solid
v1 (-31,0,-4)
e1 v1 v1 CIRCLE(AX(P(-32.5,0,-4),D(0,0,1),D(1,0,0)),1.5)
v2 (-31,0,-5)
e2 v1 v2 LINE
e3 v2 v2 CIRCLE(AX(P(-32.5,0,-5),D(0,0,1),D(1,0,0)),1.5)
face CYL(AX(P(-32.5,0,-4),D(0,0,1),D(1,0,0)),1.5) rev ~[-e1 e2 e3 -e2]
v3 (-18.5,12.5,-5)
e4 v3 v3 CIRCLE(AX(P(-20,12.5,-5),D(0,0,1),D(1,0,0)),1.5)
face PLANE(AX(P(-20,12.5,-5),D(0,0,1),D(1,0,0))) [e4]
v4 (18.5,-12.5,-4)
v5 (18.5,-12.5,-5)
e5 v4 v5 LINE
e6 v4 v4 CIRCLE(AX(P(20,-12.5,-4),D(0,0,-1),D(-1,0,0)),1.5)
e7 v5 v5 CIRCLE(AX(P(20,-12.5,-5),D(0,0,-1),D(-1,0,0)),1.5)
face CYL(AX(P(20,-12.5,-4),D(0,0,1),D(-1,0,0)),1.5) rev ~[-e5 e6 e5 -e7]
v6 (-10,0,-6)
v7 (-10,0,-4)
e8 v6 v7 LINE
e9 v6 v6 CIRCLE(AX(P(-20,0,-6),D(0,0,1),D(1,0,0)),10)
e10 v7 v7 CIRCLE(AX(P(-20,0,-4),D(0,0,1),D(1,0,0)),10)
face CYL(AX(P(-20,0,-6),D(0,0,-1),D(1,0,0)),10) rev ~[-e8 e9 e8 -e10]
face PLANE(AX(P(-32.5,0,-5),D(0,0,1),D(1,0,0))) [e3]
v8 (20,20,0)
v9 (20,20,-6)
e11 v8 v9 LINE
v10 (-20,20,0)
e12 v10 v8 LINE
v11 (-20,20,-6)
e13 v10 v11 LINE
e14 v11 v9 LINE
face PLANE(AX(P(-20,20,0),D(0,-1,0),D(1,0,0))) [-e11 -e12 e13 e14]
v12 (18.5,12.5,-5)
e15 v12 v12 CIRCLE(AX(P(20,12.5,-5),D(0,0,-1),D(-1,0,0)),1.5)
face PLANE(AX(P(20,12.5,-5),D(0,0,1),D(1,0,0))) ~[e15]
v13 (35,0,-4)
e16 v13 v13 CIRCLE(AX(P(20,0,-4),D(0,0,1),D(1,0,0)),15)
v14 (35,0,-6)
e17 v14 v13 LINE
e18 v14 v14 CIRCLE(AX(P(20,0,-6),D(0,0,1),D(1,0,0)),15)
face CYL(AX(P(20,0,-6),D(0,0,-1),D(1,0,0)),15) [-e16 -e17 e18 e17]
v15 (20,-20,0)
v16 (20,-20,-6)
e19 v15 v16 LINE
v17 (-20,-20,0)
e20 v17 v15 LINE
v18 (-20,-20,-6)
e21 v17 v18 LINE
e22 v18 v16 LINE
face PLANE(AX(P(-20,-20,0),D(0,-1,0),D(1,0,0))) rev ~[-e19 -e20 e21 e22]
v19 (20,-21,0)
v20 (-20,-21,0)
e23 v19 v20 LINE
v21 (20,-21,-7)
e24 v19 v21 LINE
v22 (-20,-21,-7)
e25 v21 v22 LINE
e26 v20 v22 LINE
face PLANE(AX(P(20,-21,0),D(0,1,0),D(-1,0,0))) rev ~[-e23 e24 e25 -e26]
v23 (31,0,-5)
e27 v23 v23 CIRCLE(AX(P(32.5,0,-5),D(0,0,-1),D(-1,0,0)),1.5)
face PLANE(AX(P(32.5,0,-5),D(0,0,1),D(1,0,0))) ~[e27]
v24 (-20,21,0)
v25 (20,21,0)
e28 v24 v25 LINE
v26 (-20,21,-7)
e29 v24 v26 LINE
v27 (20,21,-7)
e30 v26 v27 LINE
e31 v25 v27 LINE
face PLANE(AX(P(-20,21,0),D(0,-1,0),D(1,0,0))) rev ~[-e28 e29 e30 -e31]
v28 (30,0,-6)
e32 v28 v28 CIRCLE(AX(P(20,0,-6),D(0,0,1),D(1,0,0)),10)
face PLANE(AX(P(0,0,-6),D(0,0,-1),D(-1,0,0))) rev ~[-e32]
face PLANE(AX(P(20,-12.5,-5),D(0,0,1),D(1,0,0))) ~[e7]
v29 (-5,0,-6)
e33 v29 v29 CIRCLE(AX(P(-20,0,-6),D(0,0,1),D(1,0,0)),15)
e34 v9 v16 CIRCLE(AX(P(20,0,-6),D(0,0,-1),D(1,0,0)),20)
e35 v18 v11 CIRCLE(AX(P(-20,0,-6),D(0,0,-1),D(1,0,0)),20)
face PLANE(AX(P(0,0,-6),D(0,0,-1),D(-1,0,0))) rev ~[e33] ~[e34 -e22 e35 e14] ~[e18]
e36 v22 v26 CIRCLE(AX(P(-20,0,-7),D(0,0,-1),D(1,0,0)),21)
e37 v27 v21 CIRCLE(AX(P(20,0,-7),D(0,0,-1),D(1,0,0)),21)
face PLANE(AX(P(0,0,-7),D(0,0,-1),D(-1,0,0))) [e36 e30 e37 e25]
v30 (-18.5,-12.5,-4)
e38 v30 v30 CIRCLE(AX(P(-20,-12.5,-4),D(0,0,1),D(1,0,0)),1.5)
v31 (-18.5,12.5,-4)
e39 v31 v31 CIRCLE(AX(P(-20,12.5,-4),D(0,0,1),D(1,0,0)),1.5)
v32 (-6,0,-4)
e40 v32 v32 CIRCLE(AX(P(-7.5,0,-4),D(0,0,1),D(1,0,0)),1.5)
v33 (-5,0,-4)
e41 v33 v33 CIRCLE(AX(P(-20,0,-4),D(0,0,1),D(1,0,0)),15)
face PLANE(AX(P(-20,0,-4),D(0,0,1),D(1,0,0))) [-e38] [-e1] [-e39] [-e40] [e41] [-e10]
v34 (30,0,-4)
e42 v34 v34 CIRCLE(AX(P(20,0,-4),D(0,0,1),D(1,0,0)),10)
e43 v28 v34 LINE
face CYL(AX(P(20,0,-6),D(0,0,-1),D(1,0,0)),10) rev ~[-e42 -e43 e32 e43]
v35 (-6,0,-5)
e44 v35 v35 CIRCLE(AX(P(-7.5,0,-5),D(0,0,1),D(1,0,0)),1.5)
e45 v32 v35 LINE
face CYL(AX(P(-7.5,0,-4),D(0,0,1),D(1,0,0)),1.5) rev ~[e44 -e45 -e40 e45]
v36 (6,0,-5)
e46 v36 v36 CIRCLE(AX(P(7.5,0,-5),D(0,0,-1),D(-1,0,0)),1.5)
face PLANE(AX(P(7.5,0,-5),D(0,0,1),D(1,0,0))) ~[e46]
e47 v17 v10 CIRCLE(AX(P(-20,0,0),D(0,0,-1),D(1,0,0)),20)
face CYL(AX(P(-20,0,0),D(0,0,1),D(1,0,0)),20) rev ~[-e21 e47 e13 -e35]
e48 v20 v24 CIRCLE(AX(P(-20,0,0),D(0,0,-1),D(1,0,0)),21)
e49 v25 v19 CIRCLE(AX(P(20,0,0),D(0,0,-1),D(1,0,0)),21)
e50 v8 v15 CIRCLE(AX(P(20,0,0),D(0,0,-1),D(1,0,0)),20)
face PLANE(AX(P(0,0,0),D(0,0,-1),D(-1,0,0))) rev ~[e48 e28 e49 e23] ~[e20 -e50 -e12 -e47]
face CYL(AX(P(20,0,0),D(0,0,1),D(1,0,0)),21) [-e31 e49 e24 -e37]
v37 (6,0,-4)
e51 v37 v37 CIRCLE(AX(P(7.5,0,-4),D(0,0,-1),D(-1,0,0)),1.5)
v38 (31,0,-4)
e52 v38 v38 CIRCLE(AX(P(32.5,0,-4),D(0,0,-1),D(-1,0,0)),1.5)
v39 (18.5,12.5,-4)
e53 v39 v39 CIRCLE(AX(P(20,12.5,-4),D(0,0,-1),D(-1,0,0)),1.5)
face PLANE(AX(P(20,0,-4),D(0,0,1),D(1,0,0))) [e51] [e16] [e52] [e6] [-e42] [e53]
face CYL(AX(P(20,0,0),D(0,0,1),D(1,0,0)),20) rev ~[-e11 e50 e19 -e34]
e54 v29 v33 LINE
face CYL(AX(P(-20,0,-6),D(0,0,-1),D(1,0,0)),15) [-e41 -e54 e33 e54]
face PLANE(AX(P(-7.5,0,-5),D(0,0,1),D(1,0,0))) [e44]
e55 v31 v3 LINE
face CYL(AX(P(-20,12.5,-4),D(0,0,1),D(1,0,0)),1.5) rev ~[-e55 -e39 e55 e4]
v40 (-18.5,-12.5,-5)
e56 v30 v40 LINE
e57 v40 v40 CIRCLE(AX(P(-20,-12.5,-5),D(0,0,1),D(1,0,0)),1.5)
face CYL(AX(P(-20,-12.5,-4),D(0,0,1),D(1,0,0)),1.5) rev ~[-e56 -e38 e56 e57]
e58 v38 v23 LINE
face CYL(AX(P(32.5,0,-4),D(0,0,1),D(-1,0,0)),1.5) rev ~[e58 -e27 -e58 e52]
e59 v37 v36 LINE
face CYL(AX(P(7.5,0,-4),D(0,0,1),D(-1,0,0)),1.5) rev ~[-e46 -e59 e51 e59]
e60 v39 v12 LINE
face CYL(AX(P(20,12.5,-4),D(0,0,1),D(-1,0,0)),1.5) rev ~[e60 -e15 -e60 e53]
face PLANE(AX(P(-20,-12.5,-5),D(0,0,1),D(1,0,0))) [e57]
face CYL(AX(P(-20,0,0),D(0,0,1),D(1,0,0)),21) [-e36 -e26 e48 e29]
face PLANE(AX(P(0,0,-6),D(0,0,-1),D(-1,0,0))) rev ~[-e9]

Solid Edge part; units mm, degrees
sketch "Sketch1" plane through (0, 0, 0) normal (0, 0, 1) x (1, 0, 0)
  line L0 (20, -21) -> (-20, -21)
  line L1 (-20, 21) -> (20, 21)
  arc A0 (20, 21) -> (20, -21) centre (20, 0) cw
  arc A1 (-20, -21) -> (-20, 21) centre (-20, 0) cw
extrude "Protrusion1" add sketch "Sketch1" against normal blind 7
sketch "Sketch2" plane through (0, 0, 0) normal (0, 0, 1) x (1, 0, 0)
  arc A0 (-20, -20) -> (-20, 20) centre (-20, 0) cw
  line L0 (-20, -20) -> (20, -20)
  arc A1 (20, 20) -> (20, -20) centre (20, 0) cw
  line L1 (-20, 20) -> (20, 20)
extrude "VaciadoExtruido_1" cut sketch "Sketch2" against normal blind 6
sketch "Sketch3" plane through (0, 0, -6) normal (0, 0, 1) x (1, 0, 0)
  circle A0 centre (-20, 0) radius 10
  circle A1 centre (-20, 0) radius 15
  circle A2 centre (20, 0) radius 15
  circle A3 centre (20, 0) radius 10
  dimension "D1" = 40
  dimension "D2" = 20
extrude "Protrusion2" add sketch "Sketch3" along normal blind 2
sketch "Sketch4" plane through (-20, 0, -4) normal (0, 0, 1) x (1, 0, 0)
  circle A0 centre (0, 12.5) radius 1.5
  circle A1 centre (-12.5, 0) radius 1.5
  circle A2 centre (0, -12.5) radius 1.5
  circle A3 centre (12.5, 0) radius 1.5
extrude "VaciadoExtruido_2" cut sketch "Sketch4" against normal blind 1
mirror "Mirror1" about plane through (0, 0, 0) normal (1, 0, 0) of "VaciadoExtruido_2"
